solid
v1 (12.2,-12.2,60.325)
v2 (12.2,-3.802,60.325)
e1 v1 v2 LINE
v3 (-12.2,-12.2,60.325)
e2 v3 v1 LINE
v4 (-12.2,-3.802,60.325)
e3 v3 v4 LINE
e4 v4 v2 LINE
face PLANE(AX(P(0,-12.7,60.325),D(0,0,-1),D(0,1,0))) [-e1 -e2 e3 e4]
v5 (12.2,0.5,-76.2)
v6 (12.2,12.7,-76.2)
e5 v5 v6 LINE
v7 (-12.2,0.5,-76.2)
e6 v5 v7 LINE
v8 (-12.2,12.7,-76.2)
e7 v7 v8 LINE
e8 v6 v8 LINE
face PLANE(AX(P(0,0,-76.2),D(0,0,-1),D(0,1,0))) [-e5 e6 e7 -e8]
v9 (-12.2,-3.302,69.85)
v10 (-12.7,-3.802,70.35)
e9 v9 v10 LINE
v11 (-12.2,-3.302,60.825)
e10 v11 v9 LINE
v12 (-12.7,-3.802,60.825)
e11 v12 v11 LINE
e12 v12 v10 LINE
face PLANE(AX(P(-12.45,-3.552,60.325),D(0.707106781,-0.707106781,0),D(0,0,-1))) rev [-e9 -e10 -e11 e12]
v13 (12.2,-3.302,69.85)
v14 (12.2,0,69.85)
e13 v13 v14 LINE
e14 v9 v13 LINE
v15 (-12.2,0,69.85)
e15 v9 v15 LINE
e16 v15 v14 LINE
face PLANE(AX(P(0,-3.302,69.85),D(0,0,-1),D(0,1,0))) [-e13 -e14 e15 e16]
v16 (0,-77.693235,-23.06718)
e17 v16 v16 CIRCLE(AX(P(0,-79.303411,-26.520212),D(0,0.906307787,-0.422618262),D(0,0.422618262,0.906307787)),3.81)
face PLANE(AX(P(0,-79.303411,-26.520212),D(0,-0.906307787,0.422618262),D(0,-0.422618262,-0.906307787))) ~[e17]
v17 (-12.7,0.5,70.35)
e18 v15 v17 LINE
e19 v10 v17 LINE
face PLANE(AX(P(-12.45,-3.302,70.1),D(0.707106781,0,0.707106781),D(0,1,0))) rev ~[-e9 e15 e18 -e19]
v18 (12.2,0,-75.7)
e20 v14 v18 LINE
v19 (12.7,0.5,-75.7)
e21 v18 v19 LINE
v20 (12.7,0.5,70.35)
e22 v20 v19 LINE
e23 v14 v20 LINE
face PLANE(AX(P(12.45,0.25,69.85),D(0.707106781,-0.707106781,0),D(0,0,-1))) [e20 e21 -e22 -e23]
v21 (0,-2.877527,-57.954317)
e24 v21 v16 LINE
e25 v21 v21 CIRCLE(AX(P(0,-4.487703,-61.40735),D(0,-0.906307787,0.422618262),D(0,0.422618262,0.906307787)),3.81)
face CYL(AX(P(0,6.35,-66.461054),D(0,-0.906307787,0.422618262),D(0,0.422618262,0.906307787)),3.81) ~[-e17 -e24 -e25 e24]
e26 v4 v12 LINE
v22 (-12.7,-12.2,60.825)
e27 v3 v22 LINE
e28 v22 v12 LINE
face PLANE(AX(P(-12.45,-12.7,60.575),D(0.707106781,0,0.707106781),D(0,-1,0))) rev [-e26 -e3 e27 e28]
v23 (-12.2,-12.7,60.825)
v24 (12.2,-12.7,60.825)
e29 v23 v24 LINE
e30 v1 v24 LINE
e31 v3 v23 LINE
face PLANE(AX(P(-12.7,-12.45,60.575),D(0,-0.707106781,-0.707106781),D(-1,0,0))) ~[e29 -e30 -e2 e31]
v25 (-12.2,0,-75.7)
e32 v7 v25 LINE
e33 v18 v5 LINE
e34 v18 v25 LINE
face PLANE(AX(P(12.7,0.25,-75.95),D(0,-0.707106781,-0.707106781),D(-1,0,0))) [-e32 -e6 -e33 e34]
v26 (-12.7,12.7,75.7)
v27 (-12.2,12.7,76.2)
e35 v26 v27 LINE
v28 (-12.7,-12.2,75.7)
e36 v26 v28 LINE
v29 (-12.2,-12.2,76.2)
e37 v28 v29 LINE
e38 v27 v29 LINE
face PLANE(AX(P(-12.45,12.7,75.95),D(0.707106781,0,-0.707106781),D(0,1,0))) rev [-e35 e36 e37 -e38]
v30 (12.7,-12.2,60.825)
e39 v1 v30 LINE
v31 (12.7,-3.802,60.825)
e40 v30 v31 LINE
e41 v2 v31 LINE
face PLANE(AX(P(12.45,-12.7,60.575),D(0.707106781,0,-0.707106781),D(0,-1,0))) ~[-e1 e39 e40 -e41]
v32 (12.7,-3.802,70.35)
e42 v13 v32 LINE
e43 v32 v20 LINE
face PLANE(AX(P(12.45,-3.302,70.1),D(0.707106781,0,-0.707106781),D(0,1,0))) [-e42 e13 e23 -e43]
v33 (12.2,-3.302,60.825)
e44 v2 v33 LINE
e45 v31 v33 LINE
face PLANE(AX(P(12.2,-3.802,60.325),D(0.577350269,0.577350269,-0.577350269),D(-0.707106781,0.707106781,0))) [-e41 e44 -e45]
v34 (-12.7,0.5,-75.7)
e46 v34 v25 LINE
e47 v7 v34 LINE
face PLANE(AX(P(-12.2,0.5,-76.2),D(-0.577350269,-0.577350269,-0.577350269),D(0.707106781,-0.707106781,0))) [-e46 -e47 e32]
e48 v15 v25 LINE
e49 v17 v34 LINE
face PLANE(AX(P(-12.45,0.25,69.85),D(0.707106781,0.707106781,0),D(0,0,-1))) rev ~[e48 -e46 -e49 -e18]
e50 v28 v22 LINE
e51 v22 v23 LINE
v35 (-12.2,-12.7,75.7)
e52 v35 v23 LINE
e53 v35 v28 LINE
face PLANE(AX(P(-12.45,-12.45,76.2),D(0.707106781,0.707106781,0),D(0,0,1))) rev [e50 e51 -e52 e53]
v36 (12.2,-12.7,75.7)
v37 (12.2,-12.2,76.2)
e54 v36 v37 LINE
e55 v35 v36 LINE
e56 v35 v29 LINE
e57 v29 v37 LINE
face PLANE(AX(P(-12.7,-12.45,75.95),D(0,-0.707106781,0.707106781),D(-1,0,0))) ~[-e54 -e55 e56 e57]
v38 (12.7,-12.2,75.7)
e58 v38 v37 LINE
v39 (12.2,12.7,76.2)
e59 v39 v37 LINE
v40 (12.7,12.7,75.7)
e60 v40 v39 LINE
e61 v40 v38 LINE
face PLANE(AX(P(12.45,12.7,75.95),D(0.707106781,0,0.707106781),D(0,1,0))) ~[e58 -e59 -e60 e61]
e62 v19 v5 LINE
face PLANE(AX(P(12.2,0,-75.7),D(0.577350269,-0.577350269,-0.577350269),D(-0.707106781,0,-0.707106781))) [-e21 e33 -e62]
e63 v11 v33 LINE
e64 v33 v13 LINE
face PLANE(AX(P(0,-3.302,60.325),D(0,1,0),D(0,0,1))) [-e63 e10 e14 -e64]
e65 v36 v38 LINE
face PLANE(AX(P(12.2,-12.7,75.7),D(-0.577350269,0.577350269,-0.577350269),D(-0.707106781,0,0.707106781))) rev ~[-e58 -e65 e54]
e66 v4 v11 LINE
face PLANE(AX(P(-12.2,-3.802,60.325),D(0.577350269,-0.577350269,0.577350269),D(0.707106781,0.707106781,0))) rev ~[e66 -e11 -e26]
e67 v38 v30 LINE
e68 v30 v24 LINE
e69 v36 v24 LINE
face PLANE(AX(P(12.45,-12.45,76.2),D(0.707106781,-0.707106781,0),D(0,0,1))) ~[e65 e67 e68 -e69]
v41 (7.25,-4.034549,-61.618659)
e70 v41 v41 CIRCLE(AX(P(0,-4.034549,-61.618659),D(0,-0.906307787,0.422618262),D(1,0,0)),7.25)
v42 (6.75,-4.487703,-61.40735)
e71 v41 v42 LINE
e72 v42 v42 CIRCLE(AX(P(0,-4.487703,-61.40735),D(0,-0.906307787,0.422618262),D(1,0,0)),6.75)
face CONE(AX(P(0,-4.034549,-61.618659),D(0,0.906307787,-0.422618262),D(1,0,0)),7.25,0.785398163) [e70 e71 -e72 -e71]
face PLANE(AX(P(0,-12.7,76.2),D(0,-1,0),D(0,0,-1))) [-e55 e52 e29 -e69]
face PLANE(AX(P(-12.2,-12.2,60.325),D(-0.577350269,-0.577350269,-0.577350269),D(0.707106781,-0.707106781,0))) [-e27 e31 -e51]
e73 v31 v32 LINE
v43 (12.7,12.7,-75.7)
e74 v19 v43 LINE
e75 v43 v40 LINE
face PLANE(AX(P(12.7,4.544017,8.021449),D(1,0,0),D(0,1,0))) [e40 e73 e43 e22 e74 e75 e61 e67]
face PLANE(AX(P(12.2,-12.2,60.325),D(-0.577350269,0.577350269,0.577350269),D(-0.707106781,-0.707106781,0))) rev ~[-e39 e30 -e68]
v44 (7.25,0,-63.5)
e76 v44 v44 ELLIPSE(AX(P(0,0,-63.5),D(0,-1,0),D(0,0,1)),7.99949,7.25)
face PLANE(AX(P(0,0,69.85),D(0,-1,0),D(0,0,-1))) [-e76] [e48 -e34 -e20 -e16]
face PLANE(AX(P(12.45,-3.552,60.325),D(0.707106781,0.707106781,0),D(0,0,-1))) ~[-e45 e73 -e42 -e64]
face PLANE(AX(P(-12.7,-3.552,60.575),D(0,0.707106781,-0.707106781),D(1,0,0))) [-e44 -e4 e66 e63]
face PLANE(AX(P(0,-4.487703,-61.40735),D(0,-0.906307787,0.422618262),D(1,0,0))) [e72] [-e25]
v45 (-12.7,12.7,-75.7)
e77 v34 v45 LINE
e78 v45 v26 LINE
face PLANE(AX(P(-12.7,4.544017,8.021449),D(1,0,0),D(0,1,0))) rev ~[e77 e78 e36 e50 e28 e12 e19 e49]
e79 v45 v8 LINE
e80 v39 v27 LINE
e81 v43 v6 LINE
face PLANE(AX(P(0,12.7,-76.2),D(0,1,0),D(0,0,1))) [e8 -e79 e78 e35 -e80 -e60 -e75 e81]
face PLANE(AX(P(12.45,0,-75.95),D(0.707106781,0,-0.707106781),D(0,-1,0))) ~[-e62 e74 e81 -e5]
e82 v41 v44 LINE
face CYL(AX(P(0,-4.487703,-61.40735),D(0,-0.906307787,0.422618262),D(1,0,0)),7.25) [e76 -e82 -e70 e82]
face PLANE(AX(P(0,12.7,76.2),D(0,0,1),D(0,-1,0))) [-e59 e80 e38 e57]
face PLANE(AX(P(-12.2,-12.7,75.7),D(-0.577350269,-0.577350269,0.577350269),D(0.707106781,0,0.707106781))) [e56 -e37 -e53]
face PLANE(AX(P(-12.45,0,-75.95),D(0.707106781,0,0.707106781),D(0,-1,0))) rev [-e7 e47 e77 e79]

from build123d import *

# Parameters (mm, degrees)
F1_DEPTH = 12.7
F4_SIZE  = 0.5
F6_R     = 7.25
F7_DEPTH = 9.3323626992
F8_SIZE  = 0.5


# Not quite as in the source:
# - a feature names something its author has since deleted; it is built from what else it names


with BuildPart() as f1:
    # F0 (on Right) → F1 (new body, symmetric)
    with BuildSketch(Plane.YZ):
        Polygon((12.7, 76.2), (-12.7, 76.2), (-12.7, 60.325), (-3.302, 60.325), (-3.302, 69.85), (0, 69.85), (0, -76.2), (12.7, -76.2), align=None)
    extrude(amount=F1_DEPTH, both=True)

    # F2 (on Right) → F3 (revolve)
    with BuildSketch(Plane.YZ):
        Polygon((-77.6932350437, -23.067179641), (-79.3034106209, -26.5202123096), (6.35, -66.4610536293), (7.9601755772, -63.0080209607), align=None)
    revolve(axis=Axis((0, -36.4767053105, -46.4906329695), (0, 0.906307787, -0.4226182617)))

    # F4
    f4_edges = [f1.edges().sort_by_distance(p)[0] for p in [
        (-12.7, 0, 76.2),
        (-12.7, 0, -3.175),
        (-12.7, 6.35, -76.2),
        (-12.7, -1.651, 69.85),
        (-12.7, -3.302, 65.0875),
        (-12.7, -12.7, 68.2625),
        (-12.7, -8.001, 60.325),
        (12.7, 6.35, -76.2),
        (12.7, 0, 76.2),
        (12.7, -12.7, 68.2625),
        (12.7, -1.651, 69.85),
        (12.7, -3.302, 65.0875),
        (12.7, -8.001, 60.325),
        (12.7, 0, -3.175),
        (0, 0, -76.2),
        (0, -12.7, 76.2),
        (0, -12.7, 60.325),
        (0, -3.302, 60.325),
    ]]
    chamfer(f4_edges, length=F4_SIZE)

    # F6 (on offset) → F7 (join, up to face)
    with BuildSketch(Plane(origin=(0, 19.834208268, -9.2488432088), x_dir=(1, 0, 0), z_dir=(0, -0.906307787, 0.4226182617))):
        with Locations((0, -57.5505444768)):
            Circle(F6_R)
    extrude(amount=-F7_DEPTH)

    # F8
    f8_edges = [f1.edges().sort_by_distance(p)[0] for p in [
        (-7.25, -4.487703, -61.40735),
    ]]
    chamfer(f8_edges, length=F8_SIZE)


solid = f1.part
